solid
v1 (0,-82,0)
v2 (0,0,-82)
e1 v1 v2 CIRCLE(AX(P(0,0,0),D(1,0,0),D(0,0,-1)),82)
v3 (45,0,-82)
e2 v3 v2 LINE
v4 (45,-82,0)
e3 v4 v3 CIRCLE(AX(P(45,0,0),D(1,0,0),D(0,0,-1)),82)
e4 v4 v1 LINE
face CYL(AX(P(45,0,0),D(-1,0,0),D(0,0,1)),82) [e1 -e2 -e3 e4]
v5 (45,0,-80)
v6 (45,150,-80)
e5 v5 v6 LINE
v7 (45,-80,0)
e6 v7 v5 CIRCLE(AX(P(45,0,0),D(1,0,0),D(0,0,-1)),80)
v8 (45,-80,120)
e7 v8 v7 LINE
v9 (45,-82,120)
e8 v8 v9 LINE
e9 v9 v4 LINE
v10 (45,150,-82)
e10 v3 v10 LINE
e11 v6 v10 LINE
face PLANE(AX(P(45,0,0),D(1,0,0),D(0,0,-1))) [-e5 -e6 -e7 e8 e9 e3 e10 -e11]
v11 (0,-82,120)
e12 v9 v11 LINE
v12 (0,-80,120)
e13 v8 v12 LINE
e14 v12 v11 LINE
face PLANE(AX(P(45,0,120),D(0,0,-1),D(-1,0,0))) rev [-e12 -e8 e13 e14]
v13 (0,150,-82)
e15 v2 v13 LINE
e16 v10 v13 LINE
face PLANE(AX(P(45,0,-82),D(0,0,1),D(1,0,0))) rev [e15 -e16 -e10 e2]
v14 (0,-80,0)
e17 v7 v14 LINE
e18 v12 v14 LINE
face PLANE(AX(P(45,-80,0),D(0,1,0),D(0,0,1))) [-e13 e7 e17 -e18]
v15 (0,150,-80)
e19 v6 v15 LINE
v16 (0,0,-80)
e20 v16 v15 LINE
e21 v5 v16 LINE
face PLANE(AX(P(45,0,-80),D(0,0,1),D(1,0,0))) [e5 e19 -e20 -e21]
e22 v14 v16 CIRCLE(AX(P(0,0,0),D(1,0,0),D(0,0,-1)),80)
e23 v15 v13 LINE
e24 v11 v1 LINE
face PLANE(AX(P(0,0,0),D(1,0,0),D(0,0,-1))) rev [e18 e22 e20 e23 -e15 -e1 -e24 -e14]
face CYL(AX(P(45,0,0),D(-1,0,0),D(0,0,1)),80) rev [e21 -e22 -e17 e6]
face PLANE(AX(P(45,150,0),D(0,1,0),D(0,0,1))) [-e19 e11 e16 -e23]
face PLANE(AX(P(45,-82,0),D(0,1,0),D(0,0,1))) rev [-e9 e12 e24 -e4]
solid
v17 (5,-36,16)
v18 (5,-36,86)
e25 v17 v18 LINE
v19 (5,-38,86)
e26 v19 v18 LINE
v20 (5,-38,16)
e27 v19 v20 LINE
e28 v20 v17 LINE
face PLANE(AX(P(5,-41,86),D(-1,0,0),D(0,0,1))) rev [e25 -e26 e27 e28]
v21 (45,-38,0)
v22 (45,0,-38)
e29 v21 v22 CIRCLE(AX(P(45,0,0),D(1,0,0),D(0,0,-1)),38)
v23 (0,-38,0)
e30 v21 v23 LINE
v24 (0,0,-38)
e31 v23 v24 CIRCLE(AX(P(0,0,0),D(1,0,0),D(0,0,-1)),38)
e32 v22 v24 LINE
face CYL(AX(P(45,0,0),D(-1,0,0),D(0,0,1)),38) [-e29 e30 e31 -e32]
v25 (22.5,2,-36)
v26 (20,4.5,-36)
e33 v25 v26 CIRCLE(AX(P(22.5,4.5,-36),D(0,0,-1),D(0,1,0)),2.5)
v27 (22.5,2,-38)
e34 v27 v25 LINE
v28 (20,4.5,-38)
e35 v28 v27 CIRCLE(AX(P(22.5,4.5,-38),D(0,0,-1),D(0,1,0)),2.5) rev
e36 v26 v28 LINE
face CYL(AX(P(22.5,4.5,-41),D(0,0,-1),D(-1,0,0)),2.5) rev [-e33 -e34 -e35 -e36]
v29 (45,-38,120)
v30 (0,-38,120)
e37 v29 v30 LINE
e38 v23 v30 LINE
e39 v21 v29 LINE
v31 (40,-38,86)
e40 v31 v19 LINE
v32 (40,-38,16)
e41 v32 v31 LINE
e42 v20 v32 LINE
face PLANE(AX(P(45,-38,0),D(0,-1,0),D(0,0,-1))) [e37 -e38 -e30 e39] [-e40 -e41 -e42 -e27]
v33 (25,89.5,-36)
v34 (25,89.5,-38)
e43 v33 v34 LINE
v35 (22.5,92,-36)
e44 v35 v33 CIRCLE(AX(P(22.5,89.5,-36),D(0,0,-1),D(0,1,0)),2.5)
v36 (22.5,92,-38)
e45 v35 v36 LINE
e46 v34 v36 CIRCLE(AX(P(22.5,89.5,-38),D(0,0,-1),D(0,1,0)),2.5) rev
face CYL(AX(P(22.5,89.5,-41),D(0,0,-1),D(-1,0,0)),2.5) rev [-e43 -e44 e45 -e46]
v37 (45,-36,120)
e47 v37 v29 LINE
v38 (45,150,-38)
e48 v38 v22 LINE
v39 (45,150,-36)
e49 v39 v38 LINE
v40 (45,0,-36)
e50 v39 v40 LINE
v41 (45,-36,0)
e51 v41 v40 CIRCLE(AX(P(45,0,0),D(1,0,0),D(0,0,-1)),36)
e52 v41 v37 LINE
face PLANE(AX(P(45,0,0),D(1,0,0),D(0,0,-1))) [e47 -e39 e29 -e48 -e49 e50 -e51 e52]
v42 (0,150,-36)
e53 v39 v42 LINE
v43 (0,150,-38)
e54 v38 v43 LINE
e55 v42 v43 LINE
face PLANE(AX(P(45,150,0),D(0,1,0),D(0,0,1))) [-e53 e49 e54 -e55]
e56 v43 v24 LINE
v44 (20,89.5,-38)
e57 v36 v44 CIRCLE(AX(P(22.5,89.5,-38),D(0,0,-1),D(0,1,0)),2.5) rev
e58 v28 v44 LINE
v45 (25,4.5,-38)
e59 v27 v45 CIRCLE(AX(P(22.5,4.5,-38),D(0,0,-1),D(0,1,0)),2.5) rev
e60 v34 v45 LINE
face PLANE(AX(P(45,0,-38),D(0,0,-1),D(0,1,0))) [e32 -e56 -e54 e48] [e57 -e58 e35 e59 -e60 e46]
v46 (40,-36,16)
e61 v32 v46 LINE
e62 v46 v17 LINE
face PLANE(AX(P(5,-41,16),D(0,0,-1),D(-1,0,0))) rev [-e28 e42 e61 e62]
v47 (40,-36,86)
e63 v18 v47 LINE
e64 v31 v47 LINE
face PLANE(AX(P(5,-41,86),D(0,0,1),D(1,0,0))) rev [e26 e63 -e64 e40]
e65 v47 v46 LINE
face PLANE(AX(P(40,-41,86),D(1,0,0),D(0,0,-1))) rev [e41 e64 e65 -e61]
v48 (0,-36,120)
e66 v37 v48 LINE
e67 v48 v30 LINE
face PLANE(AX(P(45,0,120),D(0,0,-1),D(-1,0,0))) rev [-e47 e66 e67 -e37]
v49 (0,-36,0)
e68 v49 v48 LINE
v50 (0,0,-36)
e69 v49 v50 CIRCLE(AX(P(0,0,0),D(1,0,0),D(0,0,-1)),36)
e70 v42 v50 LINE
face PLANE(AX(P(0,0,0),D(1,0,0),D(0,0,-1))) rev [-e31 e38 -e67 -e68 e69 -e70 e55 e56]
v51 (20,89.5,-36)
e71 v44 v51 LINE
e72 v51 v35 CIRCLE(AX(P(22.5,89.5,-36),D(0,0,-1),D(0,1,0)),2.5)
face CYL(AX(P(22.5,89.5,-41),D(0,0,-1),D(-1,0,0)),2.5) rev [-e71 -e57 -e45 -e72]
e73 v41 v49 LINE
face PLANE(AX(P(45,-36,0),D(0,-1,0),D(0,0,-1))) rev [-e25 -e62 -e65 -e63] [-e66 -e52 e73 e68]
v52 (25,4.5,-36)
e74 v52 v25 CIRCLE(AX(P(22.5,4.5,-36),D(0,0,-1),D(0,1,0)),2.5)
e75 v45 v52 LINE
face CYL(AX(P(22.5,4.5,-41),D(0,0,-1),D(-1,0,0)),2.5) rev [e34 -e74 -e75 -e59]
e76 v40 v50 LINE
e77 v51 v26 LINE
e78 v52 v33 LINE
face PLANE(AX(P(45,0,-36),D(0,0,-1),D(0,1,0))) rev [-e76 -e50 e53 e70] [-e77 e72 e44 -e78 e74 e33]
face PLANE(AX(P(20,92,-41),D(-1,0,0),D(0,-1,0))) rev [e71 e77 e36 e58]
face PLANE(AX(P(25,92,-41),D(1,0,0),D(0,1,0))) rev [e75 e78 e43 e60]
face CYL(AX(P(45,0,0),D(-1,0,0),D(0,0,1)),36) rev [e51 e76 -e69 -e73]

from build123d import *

# Parameters (mm, degrees)
BOSS_EXTRUDE1_DEPTH   = 45
BOSS_EXTRUDE1_2_DEPTH = 45
SKETCH2_W             = 5
SKETCH2_H             = 90
CUT_EXTRUDE1_DEPTH    = 5
SKETCH3_W             = 35
SKETCH3_H             = 70
CUT_EXTRUDE2_DEPTH    = 5
FILLET1_R             = 2.5


with BuildPart() as part:
    # Sketch1 → Boss-Extrude1 (new body)
    with BuildSketch(Plane(origin=(0, 0, 0), x_dir=(0, 0, -1), z_dir=(1, 0, 0))):
        with BuildLine():
            Line((0, -38), (-120, -38))
            Line((-120, -38), (-120, -36))
            Line((-120, -36), (0, -36))
            ThreePointArc((0, -36), (25.455844123, -25.455844123), (36, 0))
            Line((36, 0), (36, 150))
            Line((36, 150), (38, 150))
            Line((38, 150), (38, 0))
            ThreePointArc((38, 0), (26.870057685, -26.870057685), (0, -38))
        make_face()
    extrude(amount=BOSS_EXTRUDE1_DEPTH)

    # Sketch2 → Cut-Extrude1 (cut)
    with BuildSketch(Plane.XY.offset(-36)):
        with Locations((22.5, 47)):
            Rectangle(SKETCH2_W, SKETCH2_H)
    extrude(amount=-CUT_EXTRUDE1_DEPTH, mode=Mode.SUBTRACT)

    # Sketch3 → Cut-Extrude2 (cut)
    with BuildSketch(Plane(origin=(0, -36, 0), x_dir=(1, 0, 0), z_dir=(0, 1, 0))):
        with Locations((22.5, -51)):
            Rectangle(SKETCH3_W, SKETCH3_H)
    extrude(amount=-CUT_EXTRUDE2_DEPTH, mode=Mode.SUBTRACT)

    # Fillet1
    fillet1_edges = [part.edges().sort_by_distance(p)[0] for p in [
        (25, 92, -37),
        (20, 92, -37),
        (25, 2, -37),
        (20, 2, -37),
    ]]
    fillet(fillet1_edges, radius=FILLET1_R - 0.0001)  # a hair under: the kernel refuses the full size


with BuildPart() as body_2:
    # Sketch1 → Boss-Extrude1 2 (new body)
    with BuildSketch(Plane(origin=(0, 0, 0), x_dir=(0, 0, -1), z_dir=(1, 0, 0))):
        with BuildLine():
            Line((-120, -80), (0, -80))
            ThreePointArc((0, -80), (56.568542495, -56.568542495), (80, 0))
            Line((80, 0), (80, 150))
            Line((80, 150), (82, 150))
            Line((82, 150), (82, 0))
            ThreePointArc((82, 0), (57.982756057, -57.982756057), (0, -82))
            Line((0, -82), (-120, -82))
            Line((-120, -82), (-120, -80))
        make_face()
    extrude(amount=BOSS_EXTRUDE1_2_DEPTH)


solid = Compound([part.part, body_2.part])
